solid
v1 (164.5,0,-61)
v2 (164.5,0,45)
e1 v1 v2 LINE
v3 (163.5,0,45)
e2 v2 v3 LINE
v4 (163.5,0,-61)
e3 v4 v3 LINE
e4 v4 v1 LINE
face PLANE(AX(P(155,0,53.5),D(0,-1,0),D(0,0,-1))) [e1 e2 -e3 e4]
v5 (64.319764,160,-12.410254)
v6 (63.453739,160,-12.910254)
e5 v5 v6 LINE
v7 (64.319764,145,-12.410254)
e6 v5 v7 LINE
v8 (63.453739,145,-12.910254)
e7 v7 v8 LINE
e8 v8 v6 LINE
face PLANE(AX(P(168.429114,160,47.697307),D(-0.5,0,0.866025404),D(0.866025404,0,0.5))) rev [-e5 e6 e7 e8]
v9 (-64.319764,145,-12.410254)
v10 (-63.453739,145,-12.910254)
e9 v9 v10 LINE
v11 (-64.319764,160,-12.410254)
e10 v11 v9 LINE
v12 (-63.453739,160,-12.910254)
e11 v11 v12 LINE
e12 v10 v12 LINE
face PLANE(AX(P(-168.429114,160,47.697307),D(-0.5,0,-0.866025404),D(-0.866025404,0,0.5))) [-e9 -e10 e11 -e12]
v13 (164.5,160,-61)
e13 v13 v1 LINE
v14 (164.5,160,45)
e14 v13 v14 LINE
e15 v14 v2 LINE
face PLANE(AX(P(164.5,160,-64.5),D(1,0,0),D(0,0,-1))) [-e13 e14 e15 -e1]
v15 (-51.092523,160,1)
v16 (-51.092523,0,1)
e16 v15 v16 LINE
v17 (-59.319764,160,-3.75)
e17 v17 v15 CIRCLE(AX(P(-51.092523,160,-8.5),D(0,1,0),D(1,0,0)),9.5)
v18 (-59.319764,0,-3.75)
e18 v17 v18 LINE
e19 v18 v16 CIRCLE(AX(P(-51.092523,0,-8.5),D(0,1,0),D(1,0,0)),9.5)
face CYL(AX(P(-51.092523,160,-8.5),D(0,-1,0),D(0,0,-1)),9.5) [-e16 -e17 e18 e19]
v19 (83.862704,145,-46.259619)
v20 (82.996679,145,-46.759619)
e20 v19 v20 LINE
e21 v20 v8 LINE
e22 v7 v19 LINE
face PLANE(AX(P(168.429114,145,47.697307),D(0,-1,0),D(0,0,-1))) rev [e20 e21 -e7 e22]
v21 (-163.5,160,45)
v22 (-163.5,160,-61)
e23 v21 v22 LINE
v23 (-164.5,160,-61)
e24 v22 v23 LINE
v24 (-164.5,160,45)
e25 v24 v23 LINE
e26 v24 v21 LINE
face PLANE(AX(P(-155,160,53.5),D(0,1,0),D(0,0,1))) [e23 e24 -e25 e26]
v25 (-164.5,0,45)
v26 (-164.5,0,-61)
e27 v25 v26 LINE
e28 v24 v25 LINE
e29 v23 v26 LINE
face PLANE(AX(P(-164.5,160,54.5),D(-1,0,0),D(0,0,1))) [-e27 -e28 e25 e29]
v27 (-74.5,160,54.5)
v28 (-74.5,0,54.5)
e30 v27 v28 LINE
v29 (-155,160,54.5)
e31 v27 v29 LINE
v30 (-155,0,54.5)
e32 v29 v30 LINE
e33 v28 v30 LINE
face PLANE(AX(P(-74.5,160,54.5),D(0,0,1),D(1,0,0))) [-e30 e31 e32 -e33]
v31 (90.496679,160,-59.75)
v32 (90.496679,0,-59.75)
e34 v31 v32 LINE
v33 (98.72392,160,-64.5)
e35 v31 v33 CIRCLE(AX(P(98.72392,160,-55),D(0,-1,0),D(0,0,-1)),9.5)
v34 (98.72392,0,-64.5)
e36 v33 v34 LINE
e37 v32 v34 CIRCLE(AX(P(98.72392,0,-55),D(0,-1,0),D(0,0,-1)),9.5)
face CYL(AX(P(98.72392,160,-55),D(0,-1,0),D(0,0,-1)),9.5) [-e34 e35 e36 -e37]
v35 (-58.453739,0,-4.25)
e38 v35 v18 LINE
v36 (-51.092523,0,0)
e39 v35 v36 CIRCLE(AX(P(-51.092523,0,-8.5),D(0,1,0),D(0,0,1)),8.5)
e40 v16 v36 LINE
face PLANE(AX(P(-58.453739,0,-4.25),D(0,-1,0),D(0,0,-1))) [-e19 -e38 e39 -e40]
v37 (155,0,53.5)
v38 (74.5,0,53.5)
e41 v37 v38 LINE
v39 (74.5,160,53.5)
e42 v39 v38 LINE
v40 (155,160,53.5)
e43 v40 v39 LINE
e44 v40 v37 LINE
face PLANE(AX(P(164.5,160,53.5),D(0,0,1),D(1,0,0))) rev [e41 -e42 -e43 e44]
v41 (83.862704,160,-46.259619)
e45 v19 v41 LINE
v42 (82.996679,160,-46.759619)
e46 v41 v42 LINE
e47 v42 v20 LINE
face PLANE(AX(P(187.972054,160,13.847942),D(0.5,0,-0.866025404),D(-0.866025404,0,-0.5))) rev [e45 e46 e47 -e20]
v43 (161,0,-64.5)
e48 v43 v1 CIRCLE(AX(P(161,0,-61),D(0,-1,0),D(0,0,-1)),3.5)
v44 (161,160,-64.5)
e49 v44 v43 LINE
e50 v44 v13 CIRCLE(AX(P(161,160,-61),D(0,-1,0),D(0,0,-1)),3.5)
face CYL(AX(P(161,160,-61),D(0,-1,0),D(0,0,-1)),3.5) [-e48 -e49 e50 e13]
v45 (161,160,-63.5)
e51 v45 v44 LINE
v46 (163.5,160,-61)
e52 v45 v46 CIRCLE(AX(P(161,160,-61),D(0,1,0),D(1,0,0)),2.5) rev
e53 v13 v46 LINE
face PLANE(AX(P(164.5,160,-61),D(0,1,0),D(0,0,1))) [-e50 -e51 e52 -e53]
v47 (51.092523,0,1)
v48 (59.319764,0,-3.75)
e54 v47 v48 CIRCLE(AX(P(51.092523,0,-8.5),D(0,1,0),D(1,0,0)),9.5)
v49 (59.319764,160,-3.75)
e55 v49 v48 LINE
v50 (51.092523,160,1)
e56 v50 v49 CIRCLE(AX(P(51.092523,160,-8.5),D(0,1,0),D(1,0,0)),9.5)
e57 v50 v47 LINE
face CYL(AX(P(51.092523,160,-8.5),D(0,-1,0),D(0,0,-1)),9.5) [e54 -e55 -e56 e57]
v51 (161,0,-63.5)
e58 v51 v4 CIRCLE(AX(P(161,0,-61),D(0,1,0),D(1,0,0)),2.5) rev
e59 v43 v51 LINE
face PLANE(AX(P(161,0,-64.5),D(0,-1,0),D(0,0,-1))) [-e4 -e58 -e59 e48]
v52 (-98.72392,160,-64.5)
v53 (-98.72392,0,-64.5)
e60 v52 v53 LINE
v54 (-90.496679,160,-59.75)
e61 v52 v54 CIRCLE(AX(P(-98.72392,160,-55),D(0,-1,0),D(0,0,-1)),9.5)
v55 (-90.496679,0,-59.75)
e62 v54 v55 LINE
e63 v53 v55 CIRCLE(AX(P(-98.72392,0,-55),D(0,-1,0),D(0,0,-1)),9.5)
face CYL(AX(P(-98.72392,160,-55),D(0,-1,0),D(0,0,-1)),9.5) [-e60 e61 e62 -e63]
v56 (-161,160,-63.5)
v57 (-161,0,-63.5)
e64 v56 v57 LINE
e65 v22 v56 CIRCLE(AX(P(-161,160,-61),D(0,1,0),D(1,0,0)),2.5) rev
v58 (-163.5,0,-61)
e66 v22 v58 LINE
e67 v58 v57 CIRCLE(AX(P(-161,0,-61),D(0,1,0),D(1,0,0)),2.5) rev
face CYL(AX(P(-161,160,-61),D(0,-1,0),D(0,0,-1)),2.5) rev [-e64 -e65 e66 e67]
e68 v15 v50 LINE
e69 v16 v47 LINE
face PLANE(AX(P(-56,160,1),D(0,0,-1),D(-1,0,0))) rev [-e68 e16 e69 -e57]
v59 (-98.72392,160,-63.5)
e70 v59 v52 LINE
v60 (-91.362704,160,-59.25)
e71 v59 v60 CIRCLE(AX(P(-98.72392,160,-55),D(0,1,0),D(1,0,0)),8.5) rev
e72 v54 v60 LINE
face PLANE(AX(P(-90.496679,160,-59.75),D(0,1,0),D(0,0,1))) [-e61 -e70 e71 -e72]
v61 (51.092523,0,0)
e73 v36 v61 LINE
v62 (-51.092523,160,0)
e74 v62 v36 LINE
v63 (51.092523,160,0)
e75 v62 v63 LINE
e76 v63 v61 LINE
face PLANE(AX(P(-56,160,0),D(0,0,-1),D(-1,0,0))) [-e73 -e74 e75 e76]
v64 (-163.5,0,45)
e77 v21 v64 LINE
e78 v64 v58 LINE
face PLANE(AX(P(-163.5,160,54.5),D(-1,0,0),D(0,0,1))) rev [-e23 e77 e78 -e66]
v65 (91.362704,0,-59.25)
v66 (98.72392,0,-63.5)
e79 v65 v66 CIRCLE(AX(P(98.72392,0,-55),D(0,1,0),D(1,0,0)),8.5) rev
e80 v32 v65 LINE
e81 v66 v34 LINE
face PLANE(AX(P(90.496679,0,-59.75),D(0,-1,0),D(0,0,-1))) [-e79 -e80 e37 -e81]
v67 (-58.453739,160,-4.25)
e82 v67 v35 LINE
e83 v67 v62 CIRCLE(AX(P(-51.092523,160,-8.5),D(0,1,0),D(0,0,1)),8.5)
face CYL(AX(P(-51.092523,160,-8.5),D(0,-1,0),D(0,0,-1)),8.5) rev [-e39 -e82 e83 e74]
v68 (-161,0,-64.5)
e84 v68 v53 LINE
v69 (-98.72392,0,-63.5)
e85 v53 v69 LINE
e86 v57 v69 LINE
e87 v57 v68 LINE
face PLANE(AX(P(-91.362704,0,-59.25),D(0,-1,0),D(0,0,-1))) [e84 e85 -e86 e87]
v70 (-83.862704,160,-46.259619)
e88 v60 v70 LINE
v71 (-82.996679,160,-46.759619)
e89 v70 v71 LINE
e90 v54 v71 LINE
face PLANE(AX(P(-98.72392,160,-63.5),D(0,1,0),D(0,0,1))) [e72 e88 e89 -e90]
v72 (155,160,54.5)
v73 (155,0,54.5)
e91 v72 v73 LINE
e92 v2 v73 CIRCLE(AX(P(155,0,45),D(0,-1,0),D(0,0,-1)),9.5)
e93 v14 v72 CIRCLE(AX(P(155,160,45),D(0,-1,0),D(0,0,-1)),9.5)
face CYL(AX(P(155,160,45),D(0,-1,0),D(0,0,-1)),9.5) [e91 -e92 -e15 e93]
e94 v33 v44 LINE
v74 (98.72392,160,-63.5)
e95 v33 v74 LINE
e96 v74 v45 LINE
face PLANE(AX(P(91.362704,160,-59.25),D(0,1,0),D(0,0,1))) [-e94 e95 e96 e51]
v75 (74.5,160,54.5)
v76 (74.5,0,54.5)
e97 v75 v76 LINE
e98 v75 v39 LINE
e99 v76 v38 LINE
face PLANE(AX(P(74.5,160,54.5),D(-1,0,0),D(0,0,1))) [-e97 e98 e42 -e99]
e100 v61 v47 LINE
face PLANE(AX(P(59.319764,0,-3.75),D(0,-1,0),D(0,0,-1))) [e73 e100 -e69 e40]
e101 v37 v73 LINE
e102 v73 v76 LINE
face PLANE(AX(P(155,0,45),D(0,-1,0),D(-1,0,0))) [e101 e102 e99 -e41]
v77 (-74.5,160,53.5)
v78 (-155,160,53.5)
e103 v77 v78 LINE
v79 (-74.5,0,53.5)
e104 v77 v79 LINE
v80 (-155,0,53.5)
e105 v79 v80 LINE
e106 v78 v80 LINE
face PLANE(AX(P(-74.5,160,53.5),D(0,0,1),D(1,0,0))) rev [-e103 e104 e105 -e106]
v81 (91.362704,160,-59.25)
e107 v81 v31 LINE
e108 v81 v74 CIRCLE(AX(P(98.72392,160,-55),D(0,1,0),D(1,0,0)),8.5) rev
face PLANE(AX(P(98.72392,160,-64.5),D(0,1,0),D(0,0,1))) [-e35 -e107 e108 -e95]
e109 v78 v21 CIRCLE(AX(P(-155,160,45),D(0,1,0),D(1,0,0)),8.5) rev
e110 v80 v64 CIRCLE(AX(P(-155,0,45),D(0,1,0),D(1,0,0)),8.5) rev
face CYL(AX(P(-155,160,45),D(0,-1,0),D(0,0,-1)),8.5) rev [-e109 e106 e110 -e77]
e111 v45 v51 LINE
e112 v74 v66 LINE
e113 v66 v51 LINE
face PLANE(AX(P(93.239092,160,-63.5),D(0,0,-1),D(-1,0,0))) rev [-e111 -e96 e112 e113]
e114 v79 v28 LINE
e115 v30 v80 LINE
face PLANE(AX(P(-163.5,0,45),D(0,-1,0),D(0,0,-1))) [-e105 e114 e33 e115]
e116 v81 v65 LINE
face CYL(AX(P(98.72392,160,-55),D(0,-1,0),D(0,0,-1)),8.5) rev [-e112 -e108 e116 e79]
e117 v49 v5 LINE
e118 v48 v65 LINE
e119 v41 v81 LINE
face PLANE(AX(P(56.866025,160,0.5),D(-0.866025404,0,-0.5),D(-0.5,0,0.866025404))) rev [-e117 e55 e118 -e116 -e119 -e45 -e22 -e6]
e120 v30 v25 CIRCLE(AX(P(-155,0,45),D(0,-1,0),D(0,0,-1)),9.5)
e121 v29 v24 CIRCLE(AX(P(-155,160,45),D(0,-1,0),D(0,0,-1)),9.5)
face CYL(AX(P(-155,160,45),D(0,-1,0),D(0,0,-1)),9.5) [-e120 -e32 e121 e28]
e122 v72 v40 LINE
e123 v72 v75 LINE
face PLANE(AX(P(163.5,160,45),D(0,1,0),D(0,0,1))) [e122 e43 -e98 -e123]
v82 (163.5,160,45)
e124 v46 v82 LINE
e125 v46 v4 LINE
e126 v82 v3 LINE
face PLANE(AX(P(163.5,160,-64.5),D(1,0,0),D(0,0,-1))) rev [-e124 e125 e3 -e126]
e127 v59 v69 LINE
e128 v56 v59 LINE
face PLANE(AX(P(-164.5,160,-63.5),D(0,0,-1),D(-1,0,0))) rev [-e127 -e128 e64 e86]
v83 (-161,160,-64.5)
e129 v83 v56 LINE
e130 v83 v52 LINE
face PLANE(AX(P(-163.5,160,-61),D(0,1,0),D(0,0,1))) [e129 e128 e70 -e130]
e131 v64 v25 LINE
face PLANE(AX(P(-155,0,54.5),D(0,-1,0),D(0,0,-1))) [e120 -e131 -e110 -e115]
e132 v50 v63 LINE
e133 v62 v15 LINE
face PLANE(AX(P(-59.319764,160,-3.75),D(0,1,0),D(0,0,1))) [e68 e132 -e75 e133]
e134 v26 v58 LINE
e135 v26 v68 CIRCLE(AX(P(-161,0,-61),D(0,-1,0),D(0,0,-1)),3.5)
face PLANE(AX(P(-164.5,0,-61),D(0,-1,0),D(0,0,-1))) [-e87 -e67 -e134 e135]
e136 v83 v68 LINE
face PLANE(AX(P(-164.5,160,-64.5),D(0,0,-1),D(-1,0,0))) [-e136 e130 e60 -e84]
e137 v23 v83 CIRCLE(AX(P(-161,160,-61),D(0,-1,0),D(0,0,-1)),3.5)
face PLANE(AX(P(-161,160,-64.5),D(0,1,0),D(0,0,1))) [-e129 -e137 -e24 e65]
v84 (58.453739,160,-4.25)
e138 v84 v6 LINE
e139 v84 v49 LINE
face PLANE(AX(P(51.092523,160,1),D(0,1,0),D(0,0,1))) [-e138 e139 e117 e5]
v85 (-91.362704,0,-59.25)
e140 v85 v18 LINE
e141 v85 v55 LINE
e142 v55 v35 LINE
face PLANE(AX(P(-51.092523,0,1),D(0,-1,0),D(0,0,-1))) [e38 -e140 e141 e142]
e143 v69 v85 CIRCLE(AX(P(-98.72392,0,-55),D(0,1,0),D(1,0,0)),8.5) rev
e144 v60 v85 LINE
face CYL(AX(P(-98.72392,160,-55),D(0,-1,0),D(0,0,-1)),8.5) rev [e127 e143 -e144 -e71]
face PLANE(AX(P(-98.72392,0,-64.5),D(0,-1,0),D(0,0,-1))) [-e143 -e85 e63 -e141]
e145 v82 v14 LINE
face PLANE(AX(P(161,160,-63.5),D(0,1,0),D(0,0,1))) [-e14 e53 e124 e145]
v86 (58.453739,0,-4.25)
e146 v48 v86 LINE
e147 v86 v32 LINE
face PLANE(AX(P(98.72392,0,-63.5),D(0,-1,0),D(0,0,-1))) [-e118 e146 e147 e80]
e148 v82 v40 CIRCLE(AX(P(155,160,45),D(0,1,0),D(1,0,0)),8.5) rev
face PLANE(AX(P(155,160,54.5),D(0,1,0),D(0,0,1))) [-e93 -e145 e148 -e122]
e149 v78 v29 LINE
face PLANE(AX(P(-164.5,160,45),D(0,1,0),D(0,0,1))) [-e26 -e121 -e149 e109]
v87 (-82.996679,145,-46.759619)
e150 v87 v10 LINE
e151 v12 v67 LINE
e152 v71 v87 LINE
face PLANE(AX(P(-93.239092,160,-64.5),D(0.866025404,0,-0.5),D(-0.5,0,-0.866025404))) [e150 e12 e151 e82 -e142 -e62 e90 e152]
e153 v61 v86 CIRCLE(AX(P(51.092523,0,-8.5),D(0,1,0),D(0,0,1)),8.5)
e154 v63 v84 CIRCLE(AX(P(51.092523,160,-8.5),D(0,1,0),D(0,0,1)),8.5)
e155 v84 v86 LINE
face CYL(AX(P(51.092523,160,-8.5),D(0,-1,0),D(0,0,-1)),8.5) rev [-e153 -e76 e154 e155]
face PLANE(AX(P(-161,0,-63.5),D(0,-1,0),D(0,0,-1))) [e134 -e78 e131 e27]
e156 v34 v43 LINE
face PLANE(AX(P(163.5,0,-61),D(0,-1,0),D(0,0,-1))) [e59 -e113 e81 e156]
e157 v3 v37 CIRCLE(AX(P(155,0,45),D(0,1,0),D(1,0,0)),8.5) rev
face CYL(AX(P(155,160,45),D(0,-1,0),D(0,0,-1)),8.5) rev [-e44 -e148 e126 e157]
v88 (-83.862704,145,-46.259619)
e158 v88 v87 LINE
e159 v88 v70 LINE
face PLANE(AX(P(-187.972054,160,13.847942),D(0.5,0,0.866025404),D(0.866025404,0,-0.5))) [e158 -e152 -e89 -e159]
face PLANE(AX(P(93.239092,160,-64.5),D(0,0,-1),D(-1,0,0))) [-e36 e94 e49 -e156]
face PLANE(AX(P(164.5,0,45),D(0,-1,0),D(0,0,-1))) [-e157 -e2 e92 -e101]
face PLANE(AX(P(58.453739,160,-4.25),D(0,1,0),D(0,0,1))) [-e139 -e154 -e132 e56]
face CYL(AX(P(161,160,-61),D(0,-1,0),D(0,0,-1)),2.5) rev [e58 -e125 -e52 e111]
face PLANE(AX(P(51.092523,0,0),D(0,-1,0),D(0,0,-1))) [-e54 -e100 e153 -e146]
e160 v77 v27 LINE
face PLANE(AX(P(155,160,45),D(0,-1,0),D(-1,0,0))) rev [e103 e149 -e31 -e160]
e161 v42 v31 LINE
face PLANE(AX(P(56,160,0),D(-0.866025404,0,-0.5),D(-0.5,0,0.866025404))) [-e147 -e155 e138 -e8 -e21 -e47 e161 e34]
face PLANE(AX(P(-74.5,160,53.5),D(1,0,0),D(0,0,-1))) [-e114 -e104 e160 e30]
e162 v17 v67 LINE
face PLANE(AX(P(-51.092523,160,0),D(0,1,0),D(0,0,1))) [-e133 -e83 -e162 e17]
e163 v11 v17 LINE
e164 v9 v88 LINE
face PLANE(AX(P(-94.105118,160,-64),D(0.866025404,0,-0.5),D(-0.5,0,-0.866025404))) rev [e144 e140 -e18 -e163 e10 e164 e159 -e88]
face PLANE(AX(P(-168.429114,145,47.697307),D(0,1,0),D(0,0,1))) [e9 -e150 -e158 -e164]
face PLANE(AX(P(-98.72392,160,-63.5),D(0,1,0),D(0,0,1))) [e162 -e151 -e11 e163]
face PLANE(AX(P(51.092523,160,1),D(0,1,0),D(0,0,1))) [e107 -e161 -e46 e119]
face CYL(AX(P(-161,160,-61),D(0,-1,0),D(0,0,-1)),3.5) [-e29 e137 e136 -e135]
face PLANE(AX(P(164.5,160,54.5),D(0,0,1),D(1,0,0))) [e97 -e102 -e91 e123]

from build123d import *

# Parameters (mm, degrees)
T_LE_DE_BASE_PLI_E1_DEPTH = 160
ENL_V_MAT_EXTRU_1_REACH   = 277.896
ESQUISSE2_W               = 39.08587988
ESQUISSE2_H               = 15


# Read off the part's stored shape, not the designer's step: Tôle de base pliée1
with BuildPart() as part:
    # Tôle de base pliée1 outline → Tôle de base pliée1 (new body)
    with BuildSketch(Plane(origin=(0, 0, 0), x_dir=(1, 0, 0), z_dir=(0, 1, 0))):
        with BuildLine():
            Line((155, -53.5), (74.5, -53.5))
            Line((74.5, -53.5), (74.5, -54.5))
            Line((74.5, -54.5), (155, -54.5))
            ThreePointArc((155, -54.5), (161.717514421, -51.717514421), (164.5, -45))
            Line((164.5, -45), (164.5, 61))
            ThreePointArc((164.5, 61), (163.474873734, 63.474873734), (161, 64.5))
            Line((161, 64.5), (98.72391992, 64.5))
            ThreePointArc((98.72391992, 64.5), (93.97391992, 63.227241336), (90.496678584, 59.75))
            Line((90.496678584, 59.75), (58.453738644, 4.25))
            ThreePointArc((58.453738644, 4.25), (55.342522712, 1.138784068), (51.092522712, 0))
            Line((51.092522712, 0), (-51.092522712, 0))
            ThreePointArc((-51.092522712, 0), (-55.342522712, 1.138784068), (-58.453738644, 4.25))
            Line((-58.453738644, 4.25), (-90.496678584, 59.75))
            ThreePointArc((-90.496678584, 59.75), (-93.97391992, 63.227241336), (-98.72391992, 64.5))
            Line((-98.72391992, 64.5), (-161, 64.5))
            ThreePointArc((-161, 64.5), (-163.474873734, 63.474873734), (-164.5, 61))
            Line((-164.5, 61), (-164.5, -45))
            ThreePointArc((-164.5, -45), (-161.717514421, -51.717514421), (-155, -54.5))
            Line((-155, -54.5), (-74.5, -54.5))
            Line((-74.5, -54.5), (-74.5, -53.5))
            Line((-74.5, -53.5), (-155, -53.5))
            ThreePointArc((-155, -53.5), (-161.01040764, -51.01040764), (-163.5, -45))
            Line((-163.5, -45), (-163.5, 61))
            ThreePointArc((-163.5, 61), (-162.767766953, 62.767766953), (-161, 63.5))
            Line((-161, 63.5), (-98.72391992, 63.5))
            ThreePointArc((-98.72391992, 63.5), (-94.47391992, 62.361215932), (-91.362703988, 59.25))
            Line((-91.362703988, 59.25), (-59.319764048, 3.75))
            ThreePointArc((-59.319764048, 3.75), (-55.842522712, 0.272758664), (-51.092522712, -1))
            Line((-51.092522712, -1), (51.092522712, -1))
            ThreePointArc((51.092522712, -1), (55.842522712, 0.272758664), (59.319764048, 3.75))
            Line((59.319764048, 3.75), (91.362703988, 59.25))
            ThreePointArc((91.362703988, 59.25), (94.47391992, 62.361215932), (98.72391992, 63.5))
            Line((98.72391992, 63.5), (161, 63.5))
            ThreePointArc((161, 63.5), (162.767766953, 62.767766953), (163.5, 61))
            Line((163.5, 61), (163.5, -45))
            ThreePointArc((163.5, -45), (161.01040764, -51.01040764), (155, -53.5))
        make_face()
    extrude(amount=T_LE_DE_BASE_PLI_E1_DEPTH)

    # Esquisse2 → Enlèv. mat.-Extru.1 (cut, up to next)
    with BuildSketch(Plane(origin=(42, 0, 24.248711306), x_dir=(-0.4999999999999975, 0, 0.86602540378444), z_dir=(-0.86602540378444, 0, -0.4999999999999975)), mode=Mode.PRIVATE) as enl_v_mat_extru_1_sk1:
        with Locations((-62.450417228, 152.5)):
            Rectangle(ESQUISSE2_W, ESQUISSE2_H)
    enl_v_mat_extru_1_tool1 = extrude(enl_v_mat_extru_1_sk1.sketch, amount=-ENL_V_MAT_EXTRU_1_REACH, mode=Mode.PRIVATE) & part.part
    enl_v_mat_extru_1 = enl_v_mat_extru_1_tool1.solids().sort_by_distance((73.225209, 152.5, -29.834936))[0]
    add(enl_v_mat_extru_1, mode=Mode.SUBTRACT)

    # Symétrie1: Enlèv. mat.-Extru.1 across plane
    add(enl_v_mat_extru_1.mirror(Plane(origin=(0, 0, 0), x_dir=(0, 0, 1), z_dir=(1, 0, 0))), mode=Mode.SUBTRACT)


solid = part.part
